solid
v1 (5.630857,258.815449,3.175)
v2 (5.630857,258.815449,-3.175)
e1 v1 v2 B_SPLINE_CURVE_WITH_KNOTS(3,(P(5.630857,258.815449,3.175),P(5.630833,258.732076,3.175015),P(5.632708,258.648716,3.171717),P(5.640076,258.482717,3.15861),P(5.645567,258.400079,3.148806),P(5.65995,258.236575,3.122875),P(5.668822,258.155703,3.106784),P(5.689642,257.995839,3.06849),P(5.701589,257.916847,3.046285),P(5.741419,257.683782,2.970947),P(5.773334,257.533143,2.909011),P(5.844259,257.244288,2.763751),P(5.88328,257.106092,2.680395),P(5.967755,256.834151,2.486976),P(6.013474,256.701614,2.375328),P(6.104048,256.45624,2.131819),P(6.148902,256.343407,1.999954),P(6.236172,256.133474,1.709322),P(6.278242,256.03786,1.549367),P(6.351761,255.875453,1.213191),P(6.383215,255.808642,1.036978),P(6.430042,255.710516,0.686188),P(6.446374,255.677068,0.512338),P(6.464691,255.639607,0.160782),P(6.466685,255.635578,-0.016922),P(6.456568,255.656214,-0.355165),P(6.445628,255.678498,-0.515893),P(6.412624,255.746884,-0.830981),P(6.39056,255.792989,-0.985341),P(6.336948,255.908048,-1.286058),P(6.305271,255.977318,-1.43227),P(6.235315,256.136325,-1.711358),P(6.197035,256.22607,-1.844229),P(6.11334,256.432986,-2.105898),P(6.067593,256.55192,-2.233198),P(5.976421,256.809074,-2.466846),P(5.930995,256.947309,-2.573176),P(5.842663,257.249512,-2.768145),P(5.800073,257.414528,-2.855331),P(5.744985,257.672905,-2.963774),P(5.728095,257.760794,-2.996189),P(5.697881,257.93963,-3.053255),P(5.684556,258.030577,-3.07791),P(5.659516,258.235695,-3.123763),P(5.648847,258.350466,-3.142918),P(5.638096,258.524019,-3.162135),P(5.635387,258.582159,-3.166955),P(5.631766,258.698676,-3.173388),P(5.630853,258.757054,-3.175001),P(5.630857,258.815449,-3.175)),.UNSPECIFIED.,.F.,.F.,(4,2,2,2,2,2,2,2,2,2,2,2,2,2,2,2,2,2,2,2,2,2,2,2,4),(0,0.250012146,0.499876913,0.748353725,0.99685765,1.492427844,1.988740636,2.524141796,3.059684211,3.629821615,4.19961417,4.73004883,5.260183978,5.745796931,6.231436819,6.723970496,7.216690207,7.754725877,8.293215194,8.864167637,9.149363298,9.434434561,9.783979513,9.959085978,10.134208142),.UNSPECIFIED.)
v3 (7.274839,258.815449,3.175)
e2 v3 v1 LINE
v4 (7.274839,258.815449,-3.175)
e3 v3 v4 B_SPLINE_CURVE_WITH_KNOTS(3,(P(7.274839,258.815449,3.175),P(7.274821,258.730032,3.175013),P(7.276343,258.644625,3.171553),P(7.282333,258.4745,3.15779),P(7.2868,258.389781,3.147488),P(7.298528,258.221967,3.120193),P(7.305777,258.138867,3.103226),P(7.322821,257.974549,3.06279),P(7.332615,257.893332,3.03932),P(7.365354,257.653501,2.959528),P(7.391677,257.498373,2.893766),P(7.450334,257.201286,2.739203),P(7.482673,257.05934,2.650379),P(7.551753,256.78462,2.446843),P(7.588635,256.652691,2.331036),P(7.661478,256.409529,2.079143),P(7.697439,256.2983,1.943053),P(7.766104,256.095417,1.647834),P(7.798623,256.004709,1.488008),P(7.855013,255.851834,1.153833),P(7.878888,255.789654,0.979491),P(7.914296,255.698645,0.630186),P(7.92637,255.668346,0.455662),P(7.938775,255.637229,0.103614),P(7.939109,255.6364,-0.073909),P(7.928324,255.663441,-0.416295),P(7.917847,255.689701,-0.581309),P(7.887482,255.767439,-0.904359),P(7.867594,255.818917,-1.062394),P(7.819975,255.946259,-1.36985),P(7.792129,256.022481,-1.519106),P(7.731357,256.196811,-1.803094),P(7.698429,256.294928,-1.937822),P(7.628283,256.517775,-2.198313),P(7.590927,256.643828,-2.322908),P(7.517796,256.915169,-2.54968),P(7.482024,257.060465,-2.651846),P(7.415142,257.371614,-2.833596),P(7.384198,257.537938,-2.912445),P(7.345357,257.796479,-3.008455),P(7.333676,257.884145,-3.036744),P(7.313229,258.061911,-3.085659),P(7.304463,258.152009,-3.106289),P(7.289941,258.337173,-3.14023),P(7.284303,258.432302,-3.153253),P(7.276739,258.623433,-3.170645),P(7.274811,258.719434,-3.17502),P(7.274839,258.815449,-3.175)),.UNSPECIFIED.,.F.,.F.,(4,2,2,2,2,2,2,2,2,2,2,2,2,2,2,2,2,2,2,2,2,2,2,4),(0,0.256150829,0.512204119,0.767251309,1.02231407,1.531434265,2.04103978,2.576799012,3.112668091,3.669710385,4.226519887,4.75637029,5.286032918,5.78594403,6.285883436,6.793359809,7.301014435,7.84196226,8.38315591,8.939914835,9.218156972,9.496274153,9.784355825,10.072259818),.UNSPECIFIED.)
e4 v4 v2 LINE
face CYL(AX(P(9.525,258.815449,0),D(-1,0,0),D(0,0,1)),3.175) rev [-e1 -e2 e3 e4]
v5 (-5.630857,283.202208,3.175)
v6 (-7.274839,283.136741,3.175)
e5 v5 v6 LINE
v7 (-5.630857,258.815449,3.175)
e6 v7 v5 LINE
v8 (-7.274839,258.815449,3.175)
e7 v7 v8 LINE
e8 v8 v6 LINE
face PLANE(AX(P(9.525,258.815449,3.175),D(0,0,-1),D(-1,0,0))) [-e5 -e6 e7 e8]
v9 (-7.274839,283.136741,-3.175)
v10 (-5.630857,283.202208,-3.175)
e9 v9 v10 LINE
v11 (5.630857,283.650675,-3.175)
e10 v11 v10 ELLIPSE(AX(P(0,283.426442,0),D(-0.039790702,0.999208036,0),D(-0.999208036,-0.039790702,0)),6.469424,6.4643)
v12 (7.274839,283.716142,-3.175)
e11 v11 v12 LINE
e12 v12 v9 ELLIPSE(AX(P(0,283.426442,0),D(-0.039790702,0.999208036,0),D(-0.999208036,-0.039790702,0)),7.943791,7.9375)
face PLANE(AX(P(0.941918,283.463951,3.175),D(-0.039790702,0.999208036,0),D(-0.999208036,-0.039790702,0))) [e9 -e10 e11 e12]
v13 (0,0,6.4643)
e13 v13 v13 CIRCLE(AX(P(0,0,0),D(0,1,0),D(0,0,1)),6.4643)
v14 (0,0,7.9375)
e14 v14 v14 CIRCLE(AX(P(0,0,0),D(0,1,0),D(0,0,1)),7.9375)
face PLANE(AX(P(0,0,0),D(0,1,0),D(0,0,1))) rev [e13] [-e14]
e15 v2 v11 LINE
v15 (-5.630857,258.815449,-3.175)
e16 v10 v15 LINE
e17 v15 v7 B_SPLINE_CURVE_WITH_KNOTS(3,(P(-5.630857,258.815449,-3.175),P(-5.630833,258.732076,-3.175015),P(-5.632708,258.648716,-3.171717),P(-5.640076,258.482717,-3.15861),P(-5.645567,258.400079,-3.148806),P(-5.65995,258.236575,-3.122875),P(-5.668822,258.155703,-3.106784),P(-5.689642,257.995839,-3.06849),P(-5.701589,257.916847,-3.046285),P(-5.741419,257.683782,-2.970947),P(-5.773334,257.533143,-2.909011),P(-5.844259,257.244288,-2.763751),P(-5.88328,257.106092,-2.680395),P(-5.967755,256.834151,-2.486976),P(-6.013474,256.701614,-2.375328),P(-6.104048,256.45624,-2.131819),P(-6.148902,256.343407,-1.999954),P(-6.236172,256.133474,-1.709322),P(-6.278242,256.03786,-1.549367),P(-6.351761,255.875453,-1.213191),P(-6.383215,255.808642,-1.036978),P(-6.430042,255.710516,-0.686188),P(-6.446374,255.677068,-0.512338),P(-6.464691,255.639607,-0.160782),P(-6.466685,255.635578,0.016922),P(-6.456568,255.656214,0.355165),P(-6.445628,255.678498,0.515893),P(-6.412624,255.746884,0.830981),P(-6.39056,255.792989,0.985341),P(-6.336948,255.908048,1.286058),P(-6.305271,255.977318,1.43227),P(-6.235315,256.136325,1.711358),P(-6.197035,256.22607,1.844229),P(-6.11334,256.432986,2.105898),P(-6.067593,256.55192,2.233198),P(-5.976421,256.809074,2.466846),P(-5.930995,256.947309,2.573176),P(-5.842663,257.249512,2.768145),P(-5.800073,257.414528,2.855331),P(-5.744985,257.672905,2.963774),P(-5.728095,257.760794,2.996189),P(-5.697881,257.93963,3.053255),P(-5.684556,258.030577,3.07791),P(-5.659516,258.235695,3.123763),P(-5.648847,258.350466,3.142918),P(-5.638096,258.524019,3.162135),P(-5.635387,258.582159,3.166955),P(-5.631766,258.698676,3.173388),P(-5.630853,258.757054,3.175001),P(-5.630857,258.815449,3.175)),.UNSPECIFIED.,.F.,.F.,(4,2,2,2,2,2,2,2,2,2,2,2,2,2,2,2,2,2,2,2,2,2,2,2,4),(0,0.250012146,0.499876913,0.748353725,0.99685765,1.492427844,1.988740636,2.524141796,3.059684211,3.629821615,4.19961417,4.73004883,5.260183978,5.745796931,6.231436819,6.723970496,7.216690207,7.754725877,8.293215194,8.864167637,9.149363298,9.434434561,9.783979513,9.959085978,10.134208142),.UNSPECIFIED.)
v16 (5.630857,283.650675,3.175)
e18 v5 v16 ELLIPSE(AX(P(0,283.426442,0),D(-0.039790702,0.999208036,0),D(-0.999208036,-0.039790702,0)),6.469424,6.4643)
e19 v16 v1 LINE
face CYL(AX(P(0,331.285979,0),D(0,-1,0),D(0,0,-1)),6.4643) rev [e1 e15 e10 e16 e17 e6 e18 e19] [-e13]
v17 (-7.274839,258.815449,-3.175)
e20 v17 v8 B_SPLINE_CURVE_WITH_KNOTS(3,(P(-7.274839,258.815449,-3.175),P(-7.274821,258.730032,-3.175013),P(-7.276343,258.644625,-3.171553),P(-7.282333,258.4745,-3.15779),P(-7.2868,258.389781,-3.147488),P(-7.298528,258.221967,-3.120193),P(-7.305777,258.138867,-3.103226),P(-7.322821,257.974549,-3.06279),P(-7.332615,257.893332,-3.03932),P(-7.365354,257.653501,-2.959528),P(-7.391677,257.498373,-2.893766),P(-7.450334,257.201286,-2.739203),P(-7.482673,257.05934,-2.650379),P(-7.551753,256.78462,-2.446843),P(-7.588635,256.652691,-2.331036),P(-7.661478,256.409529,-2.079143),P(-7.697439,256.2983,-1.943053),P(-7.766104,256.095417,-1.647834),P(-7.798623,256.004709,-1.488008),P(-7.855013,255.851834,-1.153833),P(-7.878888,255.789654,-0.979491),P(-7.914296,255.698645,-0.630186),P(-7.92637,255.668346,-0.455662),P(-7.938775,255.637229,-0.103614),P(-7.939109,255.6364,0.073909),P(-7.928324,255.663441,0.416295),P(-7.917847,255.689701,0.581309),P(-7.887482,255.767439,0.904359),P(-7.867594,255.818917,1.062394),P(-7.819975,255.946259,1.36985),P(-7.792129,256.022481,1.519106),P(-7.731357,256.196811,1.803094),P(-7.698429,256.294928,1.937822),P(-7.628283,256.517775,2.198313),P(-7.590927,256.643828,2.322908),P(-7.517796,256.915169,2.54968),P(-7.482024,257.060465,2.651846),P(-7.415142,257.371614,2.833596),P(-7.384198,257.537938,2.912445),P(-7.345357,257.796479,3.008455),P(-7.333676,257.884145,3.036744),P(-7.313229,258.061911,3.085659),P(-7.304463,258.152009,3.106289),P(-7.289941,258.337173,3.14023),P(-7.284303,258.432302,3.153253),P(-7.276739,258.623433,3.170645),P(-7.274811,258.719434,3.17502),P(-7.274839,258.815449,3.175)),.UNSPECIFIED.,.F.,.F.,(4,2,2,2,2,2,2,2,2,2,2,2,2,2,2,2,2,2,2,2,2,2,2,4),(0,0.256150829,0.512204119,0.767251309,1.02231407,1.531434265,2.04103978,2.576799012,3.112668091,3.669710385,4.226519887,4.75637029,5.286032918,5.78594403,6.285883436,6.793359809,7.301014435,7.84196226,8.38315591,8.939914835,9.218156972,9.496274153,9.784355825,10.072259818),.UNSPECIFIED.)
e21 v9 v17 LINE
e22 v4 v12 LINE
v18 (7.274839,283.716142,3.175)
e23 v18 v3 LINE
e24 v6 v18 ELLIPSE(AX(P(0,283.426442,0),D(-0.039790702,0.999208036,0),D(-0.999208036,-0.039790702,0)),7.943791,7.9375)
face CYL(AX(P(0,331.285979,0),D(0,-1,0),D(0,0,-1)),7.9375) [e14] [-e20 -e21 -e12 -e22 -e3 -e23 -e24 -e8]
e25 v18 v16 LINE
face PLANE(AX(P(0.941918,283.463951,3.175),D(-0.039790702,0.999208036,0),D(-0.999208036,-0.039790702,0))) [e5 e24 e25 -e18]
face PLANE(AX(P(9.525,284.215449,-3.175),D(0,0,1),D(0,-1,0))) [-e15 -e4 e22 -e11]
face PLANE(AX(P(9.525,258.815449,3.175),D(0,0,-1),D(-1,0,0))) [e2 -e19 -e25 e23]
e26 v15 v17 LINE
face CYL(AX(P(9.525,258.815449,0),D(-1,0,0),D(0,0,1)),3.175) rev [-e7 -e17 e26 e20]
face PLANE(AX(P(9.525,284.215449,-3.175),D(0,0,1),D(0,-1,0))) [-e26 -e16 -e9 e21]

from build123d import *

# Parameters (mm, degrees)
BOSS_EXTRUDE1_OUTLINE_R   = 7.9375
BOSS_EXTRUDE1_OUTLINE_R_2 = 6.4643
BOSS_EXTRUDE1_DEPTH       = 283.742530581
BOSS_EXTRUDE1_START       = -285
BOSS_EXTRUDE1_2_OUTLINE_W = 19
BOSS_EXTRUDE1_2_OUTLINE_H = 18
BOSS_EXTRUDE1_2_DEPTH     = 1.798021877
CUT_EXTRUDE1_DEPTH        = 9.525
CUT_EXTRUDE1_DEPTH_BACK   = 9.525


with BuildPart() as part:
    # Boss-Extrude1: read off the stored shape, not the designer's step
    # Boss-Extrude1 outline → Boss-Extrude1 (new body)
    with BuildSketch(Plane(origin=(0, 0, 0), x_dir=(1, 0, 0), z_dir=(0, 1, 0))):
        Circle(BOSS_EXTRUDE1_OUTLINE_R)
        Circle(BOSS_EXTRUDE1_OUTLINE_R_2, mode=Mode.SUBTRACT)
    extrude(amount=BOSS_EXTRUDE1_DEPTH)

    # Boss-Extrude1 2 outline → Boss-Extrude1 2 (cut)
    with BuildSketch(Plane(origin=(0, 0, 0), x_dir=(0.9992080363952592, 0.039790702470935205, 0), z_dir=(0.039790702470935205, -0.9992080363952592, 0)).offset(BOSS_EXTRUDE1_START)):
        with Locations((11.5, 0)):
            Rectangle(BOSS_EXTRUDE1_2_OUTLINE_W, BOSS_EXTRUDE1_2_OUTLINE_H)
    extrude(amount=BOSS_EXTRUDE1_2_DEPTH, mode=Mode.SUBTRACT)

    # Sketch2 → Cut-Extrude1 (cut, two sides: drawn at the far end of the back side and taken through both)
    with BuildSketch(Plane(origin=(0, 0, 0), x_dir=(0, 0, -1), z_dir=(1, 0, 0)).offset(-CUT_EXTRUDE1_DEPTH_BACK)):
        with BuildLine():
            Line((3.175, 284.215449167), (3.175, 258.815449167))
            ThreePointArc((3.175, 258.815449167), (0, 255.640449167), (-3.175, 258.815449167))
            Line((-3.175, 258.815449167), (-3.175, 284.215449167))
            Line((-3.175, 284.215449167), (3.175, 284.215449167))
        make_face()
    extrude(amount=CUT_EXTRUDE1_DEPTH + CUT_EXTRUDE1_DEPTH_BACK, mode=Mode.SUBTRACT)


solid = part.part
